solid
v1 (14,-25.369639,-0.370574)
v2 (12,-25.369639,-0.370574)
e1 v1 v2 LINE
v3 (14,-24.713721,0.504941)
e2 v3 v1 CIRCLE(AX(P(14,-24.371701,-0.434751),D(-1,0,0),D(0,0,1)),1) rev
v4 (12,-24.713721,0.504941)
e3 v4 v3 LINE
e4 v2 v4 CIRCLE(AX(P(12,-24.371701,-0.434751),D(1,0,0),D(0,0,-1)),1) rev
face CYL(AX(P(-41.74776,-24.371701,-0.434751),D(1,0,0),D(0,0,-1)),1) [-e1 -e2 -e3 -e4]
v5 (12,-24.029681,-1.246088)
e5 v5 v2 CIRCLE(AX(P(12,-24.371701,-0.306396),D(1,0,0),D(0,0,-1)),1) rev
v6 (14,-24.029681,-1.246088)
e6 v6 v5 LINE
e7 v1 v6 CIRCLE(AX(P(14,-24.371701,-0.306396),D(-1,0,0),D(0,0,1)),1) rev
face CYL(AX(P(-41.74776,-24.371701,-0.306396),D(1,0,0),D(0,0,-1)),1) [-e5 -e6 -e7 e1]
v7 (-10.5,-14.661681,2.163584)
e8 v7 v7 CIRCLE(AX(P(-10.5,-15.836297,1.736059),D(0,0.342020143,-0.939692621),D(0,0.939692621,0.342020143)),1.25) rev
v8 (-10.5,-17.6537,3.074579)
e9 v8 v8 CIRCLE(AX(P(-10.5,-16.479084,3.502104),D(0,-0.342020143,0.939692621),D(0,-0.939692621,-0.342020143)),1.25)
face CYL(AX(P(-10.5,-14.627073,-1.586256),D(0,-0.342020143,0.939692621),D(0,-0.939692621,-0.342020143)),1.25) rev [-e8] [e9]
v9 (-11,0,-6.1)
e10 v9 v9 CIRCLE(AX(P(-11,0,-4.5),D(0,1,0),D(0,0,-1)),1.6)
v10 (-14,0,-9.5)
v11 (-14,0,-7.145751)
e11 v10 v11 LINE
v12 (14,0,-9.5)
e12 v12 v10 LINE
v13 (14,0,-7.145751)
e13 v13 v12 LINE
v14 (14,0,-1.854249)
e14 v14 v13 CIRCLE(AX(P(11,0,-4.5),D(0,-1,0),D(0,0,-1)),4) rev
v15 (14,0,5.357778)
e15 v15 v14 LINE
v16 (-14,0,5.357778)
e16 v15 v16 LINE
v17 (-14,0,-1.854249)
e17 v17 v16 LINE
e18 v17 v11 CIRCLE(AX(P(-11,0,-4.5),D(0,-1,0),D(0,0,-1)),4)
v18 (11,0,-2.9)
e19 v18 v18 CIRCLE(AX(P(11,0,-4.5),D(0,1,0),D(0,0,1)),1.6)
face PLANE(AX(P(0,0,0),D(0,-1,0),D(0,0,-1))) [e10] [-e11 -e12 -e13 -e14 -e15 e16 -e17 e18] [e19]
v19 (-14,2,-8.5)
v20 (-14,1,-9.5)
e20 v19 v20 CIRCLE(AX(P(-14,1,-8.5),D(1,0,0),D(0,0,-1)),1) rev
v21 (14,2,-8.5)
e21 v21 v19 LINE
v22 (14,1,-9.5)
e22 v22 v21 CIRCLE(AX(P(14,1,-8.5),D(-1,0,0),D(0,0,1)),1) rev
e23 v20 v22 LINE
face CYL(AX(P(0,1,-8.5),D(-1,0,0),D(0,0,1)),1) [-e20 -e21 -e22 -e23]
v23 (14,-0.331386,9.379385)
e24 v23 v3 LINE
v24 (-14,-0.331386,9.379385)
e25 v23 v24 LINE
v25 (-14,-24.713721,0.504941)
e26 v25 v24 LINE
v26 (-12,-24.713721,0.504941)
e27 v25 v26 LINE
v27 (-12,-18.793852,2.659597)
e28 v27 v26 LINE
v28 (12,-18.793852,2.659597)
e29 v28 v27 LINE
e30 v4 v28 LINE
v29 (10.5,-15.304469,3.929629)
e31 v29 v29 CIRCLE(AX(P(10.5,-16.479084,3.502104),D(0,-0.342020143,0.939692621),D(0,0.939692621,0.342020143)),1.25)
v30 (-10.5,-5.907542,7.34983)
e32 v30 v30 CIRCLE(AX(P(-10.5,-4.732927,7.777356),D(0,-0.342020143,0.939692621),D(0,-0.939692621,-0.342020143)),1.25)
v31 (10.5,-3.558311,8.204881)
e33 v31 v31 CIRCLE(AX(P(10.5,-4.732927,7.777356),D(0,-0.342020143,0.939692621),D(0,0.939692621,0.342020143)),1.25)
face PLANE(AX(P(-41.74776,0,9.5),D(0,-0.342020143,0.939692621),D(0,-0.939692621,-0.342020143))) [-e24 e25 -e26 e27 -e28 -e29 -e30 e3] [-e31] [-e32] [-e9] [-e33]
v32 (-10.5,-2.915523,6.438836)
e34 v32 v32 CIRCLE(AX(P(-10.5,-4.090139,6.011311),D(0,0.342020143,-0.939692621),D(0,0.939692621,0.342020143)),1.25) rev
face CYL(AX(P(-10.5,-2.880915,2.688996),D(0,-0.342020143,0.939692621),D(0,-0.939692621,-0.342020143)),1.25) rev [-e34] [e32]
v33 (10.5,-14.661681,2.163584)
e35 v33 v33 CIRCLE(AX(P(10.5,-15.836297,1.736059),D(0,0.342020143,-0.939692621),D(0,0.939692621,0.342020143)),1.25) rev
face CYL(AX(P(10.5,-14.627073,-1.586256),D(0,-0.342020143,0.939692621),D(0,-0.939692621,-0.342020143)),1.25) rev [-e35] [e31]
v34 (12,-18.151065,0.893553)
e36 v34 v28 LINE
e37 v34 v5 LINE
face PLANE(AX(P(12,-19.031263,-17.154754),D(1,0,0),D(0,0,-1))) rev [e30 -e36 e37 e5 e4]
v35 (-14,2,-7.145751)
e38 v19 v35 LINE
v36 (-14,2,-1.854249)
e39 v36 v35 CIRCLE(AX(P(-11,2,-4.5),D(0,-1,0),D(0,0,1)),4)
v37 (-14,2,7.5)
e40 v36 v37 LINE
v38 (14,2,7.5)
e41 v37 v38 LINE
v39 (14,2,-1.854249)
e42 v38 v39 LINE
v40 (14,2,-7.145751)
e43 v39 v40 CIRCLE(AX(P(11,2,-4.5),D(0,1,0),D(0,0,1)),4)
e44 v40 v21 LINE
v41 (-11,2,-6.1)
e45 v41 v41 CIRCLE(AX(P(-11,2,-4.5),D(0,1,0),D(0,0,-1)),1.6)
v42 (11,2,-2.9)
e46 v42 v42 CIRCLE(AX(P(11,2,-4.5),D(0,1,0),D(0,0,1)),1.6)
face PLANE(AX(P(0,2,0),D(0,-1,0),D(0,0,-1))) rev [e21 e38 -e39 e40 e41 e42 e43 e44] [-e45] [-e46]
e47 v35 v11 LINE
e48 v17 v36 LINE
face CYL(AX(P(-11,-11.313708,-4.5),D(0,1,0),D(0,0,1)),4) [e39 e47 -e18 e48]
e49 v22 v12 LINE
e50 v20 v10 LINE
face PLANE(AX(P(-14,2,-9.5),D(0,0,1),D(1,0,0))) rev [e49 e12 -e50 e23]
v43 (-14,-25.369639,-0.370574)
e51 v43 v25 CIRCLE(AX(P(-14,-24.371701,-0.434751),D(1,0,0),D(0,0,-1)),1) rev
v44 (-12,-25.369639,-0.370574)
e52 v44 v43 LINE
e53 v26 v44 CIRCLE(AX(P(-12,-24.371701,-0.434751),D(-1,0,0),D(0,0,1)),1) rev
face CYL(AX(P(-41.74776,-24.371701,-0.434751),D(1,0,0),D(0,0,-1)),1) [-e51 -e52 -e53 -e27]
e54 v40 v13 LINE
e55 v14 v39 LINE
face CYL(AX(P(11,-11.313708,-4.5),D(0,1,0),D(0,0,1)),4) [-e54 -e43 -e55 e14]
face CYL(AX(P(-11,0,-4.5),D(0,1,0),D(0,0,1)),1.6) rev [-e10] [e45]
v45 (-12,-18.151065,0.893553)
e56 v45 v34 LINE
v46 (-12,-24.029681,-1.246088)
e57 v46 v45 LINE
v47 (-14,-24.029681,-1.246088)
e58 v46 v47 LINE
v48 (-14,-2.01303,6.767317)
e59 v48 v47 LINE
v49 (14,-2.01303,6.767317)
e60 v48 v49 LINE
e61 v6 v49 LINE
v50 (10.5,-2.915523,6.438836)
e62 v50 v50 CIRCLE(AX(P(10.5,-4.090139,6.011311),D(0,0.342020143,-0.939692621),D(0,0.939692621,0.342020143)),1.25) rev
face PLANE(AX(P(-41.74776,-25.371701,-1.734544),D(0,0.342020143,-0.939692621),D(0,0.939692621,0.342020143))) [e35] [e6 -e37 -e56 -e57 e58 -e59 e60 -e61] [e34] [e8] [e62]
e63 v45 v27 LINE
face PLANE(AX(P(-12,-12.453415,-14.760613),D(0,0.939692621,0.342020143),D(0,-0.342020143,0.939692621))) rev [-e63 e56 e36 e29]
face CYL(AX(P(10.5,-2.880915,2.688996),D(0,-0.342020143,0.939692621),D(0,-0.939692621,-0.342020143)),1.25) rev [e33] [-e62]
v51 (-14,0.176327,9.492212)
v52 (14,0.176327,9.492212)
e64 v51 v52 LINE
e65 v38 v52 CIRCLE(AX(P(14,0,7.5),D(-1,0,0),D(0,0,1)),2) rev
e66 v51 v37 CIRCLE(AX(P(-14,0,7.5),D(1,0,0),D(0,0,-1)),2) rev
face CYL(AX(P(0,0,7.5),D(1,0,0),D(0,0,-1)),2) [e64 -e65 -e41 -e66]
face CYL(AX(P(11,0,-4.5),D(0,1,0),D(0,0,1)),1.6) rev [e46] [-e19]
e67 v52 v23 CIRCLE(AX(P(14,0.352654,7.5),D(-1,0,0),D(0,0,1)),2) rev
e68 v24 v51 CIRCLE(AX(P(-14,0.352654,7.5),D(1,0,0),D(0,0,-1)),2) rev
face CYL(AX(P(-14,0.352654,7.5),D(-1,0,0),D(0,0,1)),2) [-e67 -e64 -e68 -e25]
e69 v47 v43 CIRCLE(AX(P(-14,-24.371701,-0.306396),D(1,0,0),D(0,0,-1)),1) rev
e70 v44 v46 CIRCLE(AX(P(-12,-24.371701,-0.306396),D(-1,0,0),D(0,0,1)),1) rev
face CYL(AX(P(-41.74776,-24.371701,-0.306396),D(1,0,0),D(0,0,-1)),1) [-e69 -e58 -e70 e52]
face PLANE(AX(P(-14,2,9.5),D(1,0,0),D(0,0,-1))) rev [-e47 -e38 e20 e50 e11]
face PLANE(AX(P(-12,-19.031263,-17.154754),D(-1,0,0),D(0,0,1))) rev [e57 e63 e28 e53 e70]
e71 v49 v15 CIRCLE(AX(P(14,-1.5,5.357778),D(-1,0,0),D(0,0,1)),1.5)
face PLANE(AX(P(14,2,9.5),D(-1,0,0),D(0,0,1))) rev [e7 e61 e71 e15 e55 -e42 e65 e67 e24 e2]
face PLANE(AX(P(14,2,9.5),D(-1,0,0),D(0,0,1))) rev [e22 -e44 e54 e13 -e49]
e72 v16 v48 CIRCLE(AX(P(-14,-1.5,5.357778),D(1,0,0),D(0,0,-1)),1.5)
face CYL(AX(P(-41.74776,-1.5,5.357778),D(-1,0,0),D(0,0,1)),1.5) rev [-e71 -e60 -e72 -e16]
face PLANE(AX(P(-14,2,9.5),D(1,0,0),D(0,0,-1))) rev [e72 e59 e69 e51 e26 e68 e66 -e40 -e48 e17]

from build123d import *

# Parameters (mm, degrees)
SZKIC1_W                    = 28
SZKIC1_H                    = 19
DODANIE_WYCI_GNI_CIE1_DEPTH = 2
SZKIC2_R                    = 1.6
WYTNIJ_WYCI_GNI_CIE1_DEPTH  = 18.036725037
SZKIC7_R                    = 4
SZKIC7_R_2                  = 1.6
DODANIE_WYCI_GNI_CIE3_DEPTH = 2
DODANIE_WYCI_GNI_CIE2_DEPTH = 28
SZKIC4_R                    = 1.25
WYTNIJ_WYCI_GNI_CIE2_DEPTH  = 1.879385242
WYTNIJ_WYCI_GNI_CIE4_DEPTH  = 33.297362502
ZAOKR_GLENIE1_R             = 2
ZAOKR_GLENIE2_R             = 1.5
ZAOKR_GLENIE3_R             = 1
ZAOKR_GLENIE4_R             = 1


with BuildPart() as part:
    # Szkic1 → Dodanie-wyciągnięcie1 (new body)
    with BuildSketch(Plane(origin=(0, 0, 0), x_dir=(1, 0, 0), z_dir=(0, 1, 0))):
        Rectangle(SZKIC1_W, SZKIC1_H)
    extrude(amount=DODANIE_WYCI_GNI_CIE1_DEPTH)

    # Szkic2 → Wytnij-wyciągnięcie1 (cut, through all)
    with BuildSketch(Plane(origin=(0, 2, 0), x_dir=(1, 0, 0), z_dir=(0, 1, 0))):
        with Locations(Location((11, 4.5, 0), (0, 0, 270))):
            Circle(SZKIC2_R)
        with Locations(Location((-11, 4.5, 0), (0, 0, 90))):
            Circle(SZKIC2_R)
    extrude(amount=-WYTNIJ_WYCI_GNI_CIE1_DEPTH, mode=Mode.SUBTRACT)

    # Szkic7 → Dodanie-wyciągnięcie3 (add)
    with BuildSketch(Plane(origin=(0, 2, 0), x_dir=(1, 0, 0), z_dir=(0, 1, 0))):
        with Locations((11, 4.5)):
            Circle(SZKIC7_R)
        with Locations(Location((11, 4.5, 0), (0, 0, 270))):
            Circle(SZKIC7_R_2, mode=Mode.SUBTRACT)
    dodanie_wyci_gni_cie3 = extrude(amount=-DODANIE_WYCI_GNI_CIE3_DEPTH)

    # Lustro1: Dodanie-wyciągnięcie3 across plane
    add(dodanie_wyci_gni_cie3.mirror(Plane(origin=(0, 0, 0), x_dir=(0, 0, 1), z_dir=(1, 0, 0))))

    # Szkic3 → Dodanie-wyciągnięcie2 (add)
    with BuildSketch(Plane(origin=(14, 0, 0), x_dir=(0, 0, -1), z_dir=(1, 0, 0))):
        Polygon((-9.5, 0), (-0.26545613, -25.371700761), (1.73454387, -25.371700761), (-7.5, 0), align=None)
    extrude(amount=-DODANIE_WYCI_GNI_CIE2_DEPTH)

    # Szkic4 → Wytnij-wyciągnięcie2 (cut)
    with BuildSketch(Plane(origin=(0, -3.053241146, 8.388711105), x_dir=(1, 0, 0), z_dir=(0, -0.3420201433256705, 0.9396926207859079))):
        with Locations(Location((-10.5, -1.787484051, 0), (0, 0, 270))):
            Circle(SZKIC4_R)
        with Locations(Location((-10.5, -14.287484051, 0), (0, 0, 270))):
            Circle(SZKIC4_R)
        with Locations(Location((10.5, -14.287484051, 0), (0, 0, 90))):
            Circle(SZKIC4_R)
        with Locations(Location((10.5, -1.787484051, 0), (0, 0, 90))):
            Circle(SZKIC4_R)
    extrude(amount=-WYTNIJ_WYCI_GNI_CIE2_DEPTH, mode=Mode.SUBTRACT)

    # Szkic6 → Wytnij-wyciągnięcie4 (cut, through all)
    with BuildSketch(Plane(origin=(0, -3.053241146, 8.388711105), x_dir=(1, 0, 0), z_dir=(0, -0.3420201433256704, 0.9396926207859078))):
        Polygon((-12, -23.750808638), (-12, -16.750808638), (12, -16.750808638), (12, -23.750808638), (12, -25.909421261), (-12, -25.909421261), align=None)
    extrude(amount=-WYTNIJ_WYCI_GNI_CIE4_DEPTH, mode=Mode.SUBTRACT)

    # Zaokrąglenie1
    # the kernel refuses this fillet: 2 mm, written as the material it takes off along each edge
    with BuildSketch(Plane(origin=(-19, 2, 9.5), x_dir=(0, -1, 0), z_dir=(1, 0, 0))) as zaokr_glenie1_piece_1:
        with BuildLine():
            CenterArc((ZAOKR_GLENIE1_R, ZAOKR_GLENIE1_R), ZAOKR_GLENIE1_R, 180, 90)
            Line((0, ZAOKR_GLENIE1_R), (0, 0))
            Line((0, 0), (ZAOKR_GLENIE1_R, 0))
        make_face()
    extrude(amount=38, mode=Mode.SUBTRACT)
    with BuildSketch(Plane(origin=(-14.881634904, 0, 9.5), x_dir=(0, 1, 0), z_dir=(1, 0, 0))) as zaokr_glenie1_piece_2:
        with BuildLine():
            CenterArc((ZAOKR_GLENIE1_R * 0.176326980708, -ZAOKR_GLENIE1_R), ZAOKR_GLENIE1_R, 90, 20)
            Line((-ZAOKR_GLENIE1_R * 0.165693162617, -ZAOKR_GLENIE1_R * 0.0603073792141), (0, 0))
            Line((0, 0), (ZAOKR_GLENIE1_R * 0.176326980708, 0))
        make_face()
    extrude(amount=29.763269807, mode=Mode.SUBTRACT)

    # Zaokrąglenie2
    zaokr_glenie2_edges = [part.edges().sort_by_distance(p)[0] for p in [
        (0, 0, 7.5),
    ]]
    fillet(zaokr_glenie2_edges, radius=ZAOKR_GLENIE2_R)

    # Zaokrąglenie3
    # the kernel refuses this fillet: 1 mm, written as the material it takes off along each edge
    with BuildSketch(Plane(origin=(17.570370017, -25.371700761, -1.73454387), x_dir=(0, 0.9396926207859079, 0.34202014332567016), z_dir=(-1, 0, 0)), Plane(origin=(-8.429629983, -25.371700761, -1.73454387), x_dir=(0, 0.9396926207859079, 0.34202014332567016), z_dir=(-1, 0, 0))) as zaokr_glenie3_piece_1:
        with BuildLine():
            CenterArc((ZAOKR_GLENIE3_R * 1.42814800674, -ZAOKR_GLENIE3_R), ZAOKR_GLENIE3_R, 90, 110)
            Line((ZAOKR_GLENIE3_R * 0.488455385956, -ZAOKR_GLENIE3_R * 1.34202014333), (0, 0))
            Line((0, 0), (ZAOKR_GLENIE3_R * 1.42814800674, 0))
        make_face()
    extrude(amount=9.140740034, mode=Mode.SUBTRACT)
    with BuildSketch(Plane(origin=(-10.249481154, -25.371700761, 0.26545613), x_dir=(0, 0.9396926207859077, 0.34202014332567093), z_dir=(-1, 0, 0))) as zaokr_glenie3_piece_2:
        with BuildLine():
            CenterArc((ZAOKR_GLENIE3_R * 0.70020753821, ZAOKR_GLENIE3_R), ZAOKR_GLENIE3_R, 200, 70)
            Line((-ZAOKR_GLENIE3_R * 0.239485082576, ZAOKR_GLENIE3_R * 0.657979856674), (0, 0))
            Line((0, 0), (ZAOKR_GLENIE3_R * 0.70020753821, 0))
        make_face()
    extrude(amount=5.501037691, mode=Mode.SUBTRACT)
    with BuildSketch(Plane(origin=(15.750518846, -25.371700761, 0.26545613), x_dir=(0, 0, -1), z_dir=(-1, 0, 0))) as zaokr_glenie3_piece_3:
        with BuildLine():
            CenterArc((ZAOKR_GLENIE3_R * 0.70020753821, -ZAOKR_GLENIE3_R), ZAOKR_GLENIE3_R, 90, 70)
            Line((-ZAOKR_GLENIE3_R * 0.239485082576, -ZAOKR_GLENIE3_R * 0.657979856674), (0, 0))
            Line((0, 0), (ZAOKR_GLENIE3_R * 0.70020753821, 0))
        make_face()
    extrude(amount=5.501037691, mode=Mode.SUBTRACT)

    # Zaokrąglenie4
    zaokr_glenie4_edges = [part.edges().sort_by_distance(p)[0] for p in [
        (0, 2, -9.5),
    ]]
    fillet(zaokr_glenie4_edges, radius=ZAOKR_GLENIE4_R)


solid = part.part
